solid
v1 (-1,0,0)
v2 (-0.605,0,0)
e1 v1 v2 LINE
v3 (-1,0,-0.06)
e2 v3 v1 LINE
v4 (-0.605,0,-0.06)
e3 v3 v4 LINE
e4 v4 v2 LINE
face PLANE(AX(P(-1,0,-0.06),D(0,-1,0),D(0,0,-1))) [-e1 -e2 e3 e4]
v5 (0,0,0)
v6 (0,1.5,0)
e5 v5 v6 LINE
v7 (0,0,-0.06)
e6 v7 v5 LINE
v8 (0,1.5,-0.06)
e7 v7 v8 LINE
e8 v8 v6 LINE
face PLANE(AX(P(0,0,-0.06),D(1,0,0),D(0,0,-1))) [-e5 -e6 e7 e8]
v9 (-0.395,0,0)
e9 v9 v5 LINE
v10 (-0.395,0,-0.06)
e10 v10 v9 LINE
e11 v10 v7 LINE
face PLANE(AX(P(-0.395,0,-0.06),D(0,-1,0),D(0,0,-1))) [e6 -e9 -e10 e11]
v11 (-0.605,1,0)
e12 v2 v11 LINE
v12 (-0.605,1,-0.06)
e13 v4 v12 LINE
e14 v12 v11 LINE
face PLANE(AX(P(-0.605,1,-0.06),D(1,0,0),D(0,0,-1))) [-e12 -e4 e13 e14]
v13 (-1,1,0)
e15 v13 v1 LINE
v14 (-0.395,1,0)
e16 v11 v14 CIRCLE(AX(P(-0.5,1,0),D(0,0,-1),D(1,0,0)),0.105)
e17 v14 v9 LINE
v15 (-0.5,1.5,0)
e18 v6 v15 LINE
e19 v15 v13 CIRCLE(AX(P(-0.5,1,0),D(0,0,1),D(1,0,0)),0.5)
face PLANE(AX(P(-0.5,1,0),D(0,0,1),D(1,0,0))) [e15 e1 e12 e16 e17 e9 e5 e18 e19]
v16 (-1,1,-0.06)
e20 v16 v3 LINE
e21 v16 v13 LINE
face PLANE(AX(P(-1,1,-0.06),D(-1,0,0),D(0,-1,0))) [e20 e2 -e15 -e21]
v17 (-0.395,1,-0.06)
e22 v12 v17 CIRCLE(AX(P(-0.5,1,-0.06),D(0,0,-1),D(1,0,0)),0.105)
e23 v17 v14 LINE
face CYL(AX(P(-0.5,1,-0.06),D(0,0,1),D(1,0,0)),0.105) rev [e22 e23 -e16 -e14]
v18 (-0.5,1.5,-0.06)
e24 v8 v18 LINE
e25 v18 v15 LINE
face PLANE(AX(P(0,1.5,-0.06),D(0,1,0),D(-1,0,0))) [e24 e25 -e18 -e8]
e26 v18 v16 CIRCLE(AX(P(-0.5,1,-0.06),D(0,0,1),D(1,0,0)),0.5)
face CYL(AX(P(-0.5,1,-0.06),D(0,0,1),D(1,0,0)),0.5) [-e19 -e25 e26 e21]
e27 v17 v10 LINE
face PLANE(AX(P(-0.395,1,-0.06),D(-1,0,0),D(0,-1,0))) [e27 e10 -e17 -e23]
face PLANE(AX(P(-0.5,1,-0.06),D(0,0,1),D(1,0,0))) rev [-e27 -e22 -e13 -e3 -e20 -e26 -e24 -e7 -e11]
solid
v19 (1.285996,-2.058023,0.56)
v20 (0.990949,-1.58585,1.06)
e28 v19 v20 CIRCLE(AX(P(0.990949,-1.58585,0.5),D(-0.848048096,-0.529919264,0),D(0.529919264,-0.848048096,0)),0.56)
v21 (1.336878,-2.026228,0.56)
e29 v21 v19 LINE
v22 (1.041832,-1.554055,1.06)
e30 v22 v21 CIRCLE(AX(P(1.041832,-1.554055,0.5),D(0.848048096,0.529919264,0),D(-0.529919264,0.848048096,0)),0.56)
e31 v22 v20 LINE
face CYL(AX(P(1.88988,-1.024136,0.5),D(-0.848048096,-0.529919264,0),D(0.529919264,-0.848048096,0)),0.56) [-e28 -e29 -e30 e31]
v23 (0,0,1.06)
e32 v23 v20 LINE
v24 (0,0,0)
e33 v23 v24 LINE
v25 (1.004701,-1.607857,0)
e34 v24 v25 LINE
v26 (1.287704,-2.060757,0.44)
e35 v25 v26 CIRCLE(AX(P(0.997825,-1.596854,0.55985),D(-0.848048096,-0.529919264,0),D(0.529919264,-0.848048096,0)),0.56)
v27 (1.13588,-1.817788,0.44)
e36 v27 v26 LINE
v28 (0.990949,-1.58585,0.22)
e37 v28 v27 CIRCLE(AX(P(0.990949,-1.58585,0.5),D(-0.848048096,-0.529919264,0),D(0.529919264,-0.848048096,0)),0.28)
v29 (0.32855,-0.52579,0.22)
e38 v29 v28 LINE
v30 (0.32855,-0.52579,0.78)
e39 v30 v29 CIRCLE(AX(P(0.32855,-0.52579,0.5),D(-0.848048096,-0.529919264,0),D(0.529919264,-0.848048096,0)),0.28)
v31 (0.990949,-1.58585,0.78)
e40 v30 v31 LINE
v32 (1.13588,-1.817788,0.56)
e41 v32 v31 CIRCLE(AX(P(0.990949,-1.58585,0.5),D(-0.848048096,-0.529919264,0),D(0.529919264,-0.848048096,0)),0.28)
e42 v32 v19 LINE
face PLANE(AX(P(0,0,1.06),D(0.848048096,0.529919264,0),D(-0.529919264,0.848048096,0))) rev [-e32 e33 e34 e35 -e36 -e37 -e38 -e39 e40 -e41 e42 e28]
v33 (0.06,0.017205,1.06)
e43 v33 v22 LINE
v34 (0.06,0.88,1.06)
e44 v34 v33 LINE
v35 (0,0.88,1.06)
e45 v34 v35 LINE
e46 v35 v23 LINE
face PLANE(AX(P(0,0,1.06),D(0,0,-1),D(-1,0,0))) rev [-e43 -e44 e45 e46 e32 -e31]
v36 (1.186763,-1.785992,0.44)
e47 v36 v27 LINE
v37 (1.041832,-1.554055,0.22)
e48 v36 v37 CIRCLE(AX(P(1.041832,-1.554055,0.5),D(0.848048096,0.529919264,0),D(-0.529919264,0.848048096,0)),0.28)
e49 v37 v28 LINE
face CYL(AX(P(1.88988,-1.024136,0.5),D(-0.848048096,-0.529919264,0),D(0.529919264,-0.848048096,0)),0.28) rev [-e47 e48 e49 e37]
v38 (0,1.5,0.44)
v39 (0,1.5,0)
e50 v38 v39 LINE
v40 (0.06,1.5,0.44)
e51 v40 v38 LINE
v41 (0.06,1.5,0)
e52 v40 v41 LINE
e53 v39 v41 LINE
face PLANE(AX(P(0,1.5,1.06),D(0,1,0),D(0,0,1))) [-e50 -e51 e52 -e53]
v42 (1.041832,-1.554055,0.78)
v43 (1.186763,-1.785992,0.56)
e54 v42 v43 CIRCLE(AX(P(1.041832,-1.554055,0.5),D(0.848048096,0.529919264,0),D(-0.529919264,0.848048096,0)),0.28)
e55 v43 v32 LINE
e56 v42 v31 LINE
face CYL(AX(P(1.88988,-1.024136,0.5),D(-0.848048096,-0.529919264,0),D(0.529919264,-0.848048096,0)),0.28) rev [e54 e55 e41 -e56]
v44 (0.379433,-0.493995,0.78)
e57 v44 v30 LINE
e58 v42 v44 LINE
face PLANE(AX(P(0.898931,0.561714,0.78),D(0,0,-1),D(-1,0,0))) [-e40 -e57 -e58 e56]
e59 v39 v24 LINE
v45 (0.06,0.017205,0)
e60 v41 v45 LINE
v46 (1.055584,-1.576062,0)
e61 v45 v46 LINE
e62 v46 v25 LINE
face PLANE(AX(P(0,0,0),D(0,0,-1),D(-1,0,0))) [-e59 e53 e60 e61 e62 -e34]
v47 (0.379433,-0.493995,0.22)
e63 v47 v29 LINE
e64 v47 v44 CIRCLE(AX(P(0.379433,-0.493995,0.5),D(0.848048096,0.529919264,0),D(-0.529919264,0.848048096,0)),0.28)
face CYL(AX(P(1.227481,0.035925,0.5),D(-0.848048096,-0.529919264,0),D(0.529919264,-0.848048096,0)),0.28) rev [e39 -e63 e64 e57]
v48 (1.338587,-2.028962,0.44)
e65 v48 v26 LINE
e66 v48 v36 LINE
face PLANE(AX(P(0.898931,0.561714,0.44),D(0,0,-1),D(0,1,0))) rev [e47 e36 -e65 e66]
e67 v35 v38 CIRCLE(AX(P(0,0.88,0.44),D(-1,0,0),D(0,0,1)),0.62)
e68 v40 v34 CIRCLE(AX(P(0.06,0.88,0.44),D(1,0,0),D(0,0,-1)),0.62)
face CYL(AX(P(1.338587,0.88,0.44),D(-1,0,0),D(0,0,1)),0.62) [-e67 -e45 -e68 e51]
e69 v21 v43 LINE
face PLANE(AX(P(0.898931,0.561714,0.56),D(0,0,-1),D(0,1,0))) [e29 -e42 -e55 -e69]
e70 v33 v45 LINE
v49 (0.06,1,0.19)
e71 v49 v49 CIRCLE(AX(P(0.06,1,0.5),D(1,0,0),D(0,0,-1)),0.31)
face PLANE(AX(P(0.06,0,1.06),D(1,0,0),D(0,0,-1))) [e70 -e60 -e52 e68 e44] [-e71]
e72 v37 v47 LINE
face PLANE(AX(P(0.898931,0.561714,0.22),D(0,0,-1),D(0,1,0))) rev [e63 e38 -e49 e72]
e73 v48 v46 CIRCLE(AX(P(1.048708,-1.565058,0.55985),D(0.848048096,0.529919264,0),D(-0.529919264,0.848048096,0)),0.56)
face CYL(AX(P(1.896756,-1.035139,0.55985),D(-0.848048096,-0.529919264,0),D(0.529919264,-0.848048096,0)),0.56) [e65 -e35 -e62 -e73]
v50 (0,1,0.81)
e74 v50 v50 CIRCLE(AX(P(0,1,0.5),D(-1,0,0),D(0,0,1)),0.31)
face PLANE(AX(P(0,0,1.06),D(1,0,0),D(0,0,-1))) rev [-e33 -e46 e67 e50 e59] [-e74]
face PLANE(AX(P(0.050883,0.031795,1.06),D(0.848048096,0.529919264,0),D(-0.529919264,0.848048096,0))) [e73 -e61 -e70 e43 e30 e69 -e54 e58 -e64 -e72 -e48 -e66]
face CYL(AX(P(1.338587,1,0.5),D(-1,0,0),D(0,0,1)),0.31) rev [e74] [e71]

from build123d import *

# Parameters (mm, degrees)
BOSS_EXTRUDE1_DEPTH = 0.06
EXTRUDE_THIN2_DEPTH = 1.06
SKETCH4_R           = 0.31
CUT_EXTRUDE1_DEPTH  = 3.676216217
CUT_EXTRUDE2_DEPTH  = 3.676216217
CUT_EXTRUDE3_START  = -0.06
CUT_EXTRUDE3_DEPTH  = 0.06


# Read off the part's stored shape, not the designer's step: Cut-Extrude3
with BuildPart() as part:
    # Sketch2 → Boss-Extrude1 (new body)
    with BuildSketch(Plane.XY):
        with BuildLine():
            Line((0, 0), (0, 1.5))
            Line((0, 1.5), (-0.5, 1.5))
            ThreePointArc((-0.5, 1.5), (-0.853553391, 1.353553391), (-1, 1))
            Line((-1, 1), (-1, 0))
            Line((-1, 0), (-0.605, 0))
            Line((-0.605, 0), (-0.605, 1))
            ThreePointArc((-0.605, 1), (-0.5, 1.105), (-0.395, 1))
            Line((-0.395, 1), (-0.395, 0))
            Line((-0.395, 0), (0, 0))
        make_face()
    extrude(amount=-BOSS_EXTRUDE1_DEPTH)


with BuildPart() as body_2:
    # Sketch3 → Extrude-Thin2 (new body)
    with BuildSketch(Plane.XY):
        Polygon((0, 1.5), (0, 0), (1.287703812, -2.060756874), (1.338586698, -2.028961718), (0.06, 0.017204723), (0.06, 1.5), align=None)
    extrude(amount=EXTRUDE_THIN2_DEPTH)

    # Sketch4 → Cut-Extrude1 (cut, through all)
    with BuildSketch(Plane.ZY):
        with Locations((0.5, 1)):
            Circle(SKETCH4_R)
    extrude(amount=-CUT_EXTRUDE1_DEPTH, mode=Mode.SUBTRACT)

    # Sketch4<3> → Cut-Extrude2 (cut, through all)
    with BuildSketch(Plane.ZY):
        with BuildLine():
            ThreePointArc((0.44, 1.5), (0.878406204, 1.318406204), (1.06, 0.88))
            Line((1.06, 0.88), (1.06, 1.5))
            Line((1.06, 1.5), (0.44, 1.5))
        make_face()
    extrude(amount=-CUT_EXTRUDE2_DEPTH, mode=Mode.SUBTRACT)

    # Cut-Extrude3 outline → Cut-Extrude3 (cut)
    with BuildSketch(Plane(origin=(0, 0, 0), x_dir=(0, 0, 1), z_dir=(-0.8480480961564291, -0.5299192642332001, 0)).offset(CUT_EXTRUDE3_START)):
        with BuildLine():
            Line((0.44, -2.143495887), (0.44, -2.43))
            Line((0.44, -2.43), (1.06, -2.43))
            Line((1.06, -2.43), (1.06, -1.87))
            ThreePointArc((1.06, -1.87), (0.916653333, -2.244165739), (0.56, -2.426776436))
            Line((0.56, -2.426776436), (0.56, -2.143495887))
            ThreePointArc((0.56, -2.143495887), (0.718174242, -2.045499288), (0.78, -1.87))
            Line((0.78, -1.87), (0.78, -0.62))
            ThreePointArc((0.78, -0.62), (0.5, -0.34), (0.22, -0.62))
            Line((0.22, -0.62), (0.22, -1.87))
            ThreePointArc((0.22, -1.87), (0.281825758, -2.045499288), (0.44, -2.143495887))
        make_face()
        with BuildLine():
            ThreePointArc((0.44, -2.43), (0.127646005, -2.239065143), (0, -1.895950533))
            Line((0, -1.895950533), (0, -2.43))
            Line((0, -2.43), (0.44, -2.43))
        make_face()
    extrude(amount=CUT_EXTRUDE3_DEPTH, mode=Mode.SUBTRACT)


solid = Compound([part.part, body_2.part])
